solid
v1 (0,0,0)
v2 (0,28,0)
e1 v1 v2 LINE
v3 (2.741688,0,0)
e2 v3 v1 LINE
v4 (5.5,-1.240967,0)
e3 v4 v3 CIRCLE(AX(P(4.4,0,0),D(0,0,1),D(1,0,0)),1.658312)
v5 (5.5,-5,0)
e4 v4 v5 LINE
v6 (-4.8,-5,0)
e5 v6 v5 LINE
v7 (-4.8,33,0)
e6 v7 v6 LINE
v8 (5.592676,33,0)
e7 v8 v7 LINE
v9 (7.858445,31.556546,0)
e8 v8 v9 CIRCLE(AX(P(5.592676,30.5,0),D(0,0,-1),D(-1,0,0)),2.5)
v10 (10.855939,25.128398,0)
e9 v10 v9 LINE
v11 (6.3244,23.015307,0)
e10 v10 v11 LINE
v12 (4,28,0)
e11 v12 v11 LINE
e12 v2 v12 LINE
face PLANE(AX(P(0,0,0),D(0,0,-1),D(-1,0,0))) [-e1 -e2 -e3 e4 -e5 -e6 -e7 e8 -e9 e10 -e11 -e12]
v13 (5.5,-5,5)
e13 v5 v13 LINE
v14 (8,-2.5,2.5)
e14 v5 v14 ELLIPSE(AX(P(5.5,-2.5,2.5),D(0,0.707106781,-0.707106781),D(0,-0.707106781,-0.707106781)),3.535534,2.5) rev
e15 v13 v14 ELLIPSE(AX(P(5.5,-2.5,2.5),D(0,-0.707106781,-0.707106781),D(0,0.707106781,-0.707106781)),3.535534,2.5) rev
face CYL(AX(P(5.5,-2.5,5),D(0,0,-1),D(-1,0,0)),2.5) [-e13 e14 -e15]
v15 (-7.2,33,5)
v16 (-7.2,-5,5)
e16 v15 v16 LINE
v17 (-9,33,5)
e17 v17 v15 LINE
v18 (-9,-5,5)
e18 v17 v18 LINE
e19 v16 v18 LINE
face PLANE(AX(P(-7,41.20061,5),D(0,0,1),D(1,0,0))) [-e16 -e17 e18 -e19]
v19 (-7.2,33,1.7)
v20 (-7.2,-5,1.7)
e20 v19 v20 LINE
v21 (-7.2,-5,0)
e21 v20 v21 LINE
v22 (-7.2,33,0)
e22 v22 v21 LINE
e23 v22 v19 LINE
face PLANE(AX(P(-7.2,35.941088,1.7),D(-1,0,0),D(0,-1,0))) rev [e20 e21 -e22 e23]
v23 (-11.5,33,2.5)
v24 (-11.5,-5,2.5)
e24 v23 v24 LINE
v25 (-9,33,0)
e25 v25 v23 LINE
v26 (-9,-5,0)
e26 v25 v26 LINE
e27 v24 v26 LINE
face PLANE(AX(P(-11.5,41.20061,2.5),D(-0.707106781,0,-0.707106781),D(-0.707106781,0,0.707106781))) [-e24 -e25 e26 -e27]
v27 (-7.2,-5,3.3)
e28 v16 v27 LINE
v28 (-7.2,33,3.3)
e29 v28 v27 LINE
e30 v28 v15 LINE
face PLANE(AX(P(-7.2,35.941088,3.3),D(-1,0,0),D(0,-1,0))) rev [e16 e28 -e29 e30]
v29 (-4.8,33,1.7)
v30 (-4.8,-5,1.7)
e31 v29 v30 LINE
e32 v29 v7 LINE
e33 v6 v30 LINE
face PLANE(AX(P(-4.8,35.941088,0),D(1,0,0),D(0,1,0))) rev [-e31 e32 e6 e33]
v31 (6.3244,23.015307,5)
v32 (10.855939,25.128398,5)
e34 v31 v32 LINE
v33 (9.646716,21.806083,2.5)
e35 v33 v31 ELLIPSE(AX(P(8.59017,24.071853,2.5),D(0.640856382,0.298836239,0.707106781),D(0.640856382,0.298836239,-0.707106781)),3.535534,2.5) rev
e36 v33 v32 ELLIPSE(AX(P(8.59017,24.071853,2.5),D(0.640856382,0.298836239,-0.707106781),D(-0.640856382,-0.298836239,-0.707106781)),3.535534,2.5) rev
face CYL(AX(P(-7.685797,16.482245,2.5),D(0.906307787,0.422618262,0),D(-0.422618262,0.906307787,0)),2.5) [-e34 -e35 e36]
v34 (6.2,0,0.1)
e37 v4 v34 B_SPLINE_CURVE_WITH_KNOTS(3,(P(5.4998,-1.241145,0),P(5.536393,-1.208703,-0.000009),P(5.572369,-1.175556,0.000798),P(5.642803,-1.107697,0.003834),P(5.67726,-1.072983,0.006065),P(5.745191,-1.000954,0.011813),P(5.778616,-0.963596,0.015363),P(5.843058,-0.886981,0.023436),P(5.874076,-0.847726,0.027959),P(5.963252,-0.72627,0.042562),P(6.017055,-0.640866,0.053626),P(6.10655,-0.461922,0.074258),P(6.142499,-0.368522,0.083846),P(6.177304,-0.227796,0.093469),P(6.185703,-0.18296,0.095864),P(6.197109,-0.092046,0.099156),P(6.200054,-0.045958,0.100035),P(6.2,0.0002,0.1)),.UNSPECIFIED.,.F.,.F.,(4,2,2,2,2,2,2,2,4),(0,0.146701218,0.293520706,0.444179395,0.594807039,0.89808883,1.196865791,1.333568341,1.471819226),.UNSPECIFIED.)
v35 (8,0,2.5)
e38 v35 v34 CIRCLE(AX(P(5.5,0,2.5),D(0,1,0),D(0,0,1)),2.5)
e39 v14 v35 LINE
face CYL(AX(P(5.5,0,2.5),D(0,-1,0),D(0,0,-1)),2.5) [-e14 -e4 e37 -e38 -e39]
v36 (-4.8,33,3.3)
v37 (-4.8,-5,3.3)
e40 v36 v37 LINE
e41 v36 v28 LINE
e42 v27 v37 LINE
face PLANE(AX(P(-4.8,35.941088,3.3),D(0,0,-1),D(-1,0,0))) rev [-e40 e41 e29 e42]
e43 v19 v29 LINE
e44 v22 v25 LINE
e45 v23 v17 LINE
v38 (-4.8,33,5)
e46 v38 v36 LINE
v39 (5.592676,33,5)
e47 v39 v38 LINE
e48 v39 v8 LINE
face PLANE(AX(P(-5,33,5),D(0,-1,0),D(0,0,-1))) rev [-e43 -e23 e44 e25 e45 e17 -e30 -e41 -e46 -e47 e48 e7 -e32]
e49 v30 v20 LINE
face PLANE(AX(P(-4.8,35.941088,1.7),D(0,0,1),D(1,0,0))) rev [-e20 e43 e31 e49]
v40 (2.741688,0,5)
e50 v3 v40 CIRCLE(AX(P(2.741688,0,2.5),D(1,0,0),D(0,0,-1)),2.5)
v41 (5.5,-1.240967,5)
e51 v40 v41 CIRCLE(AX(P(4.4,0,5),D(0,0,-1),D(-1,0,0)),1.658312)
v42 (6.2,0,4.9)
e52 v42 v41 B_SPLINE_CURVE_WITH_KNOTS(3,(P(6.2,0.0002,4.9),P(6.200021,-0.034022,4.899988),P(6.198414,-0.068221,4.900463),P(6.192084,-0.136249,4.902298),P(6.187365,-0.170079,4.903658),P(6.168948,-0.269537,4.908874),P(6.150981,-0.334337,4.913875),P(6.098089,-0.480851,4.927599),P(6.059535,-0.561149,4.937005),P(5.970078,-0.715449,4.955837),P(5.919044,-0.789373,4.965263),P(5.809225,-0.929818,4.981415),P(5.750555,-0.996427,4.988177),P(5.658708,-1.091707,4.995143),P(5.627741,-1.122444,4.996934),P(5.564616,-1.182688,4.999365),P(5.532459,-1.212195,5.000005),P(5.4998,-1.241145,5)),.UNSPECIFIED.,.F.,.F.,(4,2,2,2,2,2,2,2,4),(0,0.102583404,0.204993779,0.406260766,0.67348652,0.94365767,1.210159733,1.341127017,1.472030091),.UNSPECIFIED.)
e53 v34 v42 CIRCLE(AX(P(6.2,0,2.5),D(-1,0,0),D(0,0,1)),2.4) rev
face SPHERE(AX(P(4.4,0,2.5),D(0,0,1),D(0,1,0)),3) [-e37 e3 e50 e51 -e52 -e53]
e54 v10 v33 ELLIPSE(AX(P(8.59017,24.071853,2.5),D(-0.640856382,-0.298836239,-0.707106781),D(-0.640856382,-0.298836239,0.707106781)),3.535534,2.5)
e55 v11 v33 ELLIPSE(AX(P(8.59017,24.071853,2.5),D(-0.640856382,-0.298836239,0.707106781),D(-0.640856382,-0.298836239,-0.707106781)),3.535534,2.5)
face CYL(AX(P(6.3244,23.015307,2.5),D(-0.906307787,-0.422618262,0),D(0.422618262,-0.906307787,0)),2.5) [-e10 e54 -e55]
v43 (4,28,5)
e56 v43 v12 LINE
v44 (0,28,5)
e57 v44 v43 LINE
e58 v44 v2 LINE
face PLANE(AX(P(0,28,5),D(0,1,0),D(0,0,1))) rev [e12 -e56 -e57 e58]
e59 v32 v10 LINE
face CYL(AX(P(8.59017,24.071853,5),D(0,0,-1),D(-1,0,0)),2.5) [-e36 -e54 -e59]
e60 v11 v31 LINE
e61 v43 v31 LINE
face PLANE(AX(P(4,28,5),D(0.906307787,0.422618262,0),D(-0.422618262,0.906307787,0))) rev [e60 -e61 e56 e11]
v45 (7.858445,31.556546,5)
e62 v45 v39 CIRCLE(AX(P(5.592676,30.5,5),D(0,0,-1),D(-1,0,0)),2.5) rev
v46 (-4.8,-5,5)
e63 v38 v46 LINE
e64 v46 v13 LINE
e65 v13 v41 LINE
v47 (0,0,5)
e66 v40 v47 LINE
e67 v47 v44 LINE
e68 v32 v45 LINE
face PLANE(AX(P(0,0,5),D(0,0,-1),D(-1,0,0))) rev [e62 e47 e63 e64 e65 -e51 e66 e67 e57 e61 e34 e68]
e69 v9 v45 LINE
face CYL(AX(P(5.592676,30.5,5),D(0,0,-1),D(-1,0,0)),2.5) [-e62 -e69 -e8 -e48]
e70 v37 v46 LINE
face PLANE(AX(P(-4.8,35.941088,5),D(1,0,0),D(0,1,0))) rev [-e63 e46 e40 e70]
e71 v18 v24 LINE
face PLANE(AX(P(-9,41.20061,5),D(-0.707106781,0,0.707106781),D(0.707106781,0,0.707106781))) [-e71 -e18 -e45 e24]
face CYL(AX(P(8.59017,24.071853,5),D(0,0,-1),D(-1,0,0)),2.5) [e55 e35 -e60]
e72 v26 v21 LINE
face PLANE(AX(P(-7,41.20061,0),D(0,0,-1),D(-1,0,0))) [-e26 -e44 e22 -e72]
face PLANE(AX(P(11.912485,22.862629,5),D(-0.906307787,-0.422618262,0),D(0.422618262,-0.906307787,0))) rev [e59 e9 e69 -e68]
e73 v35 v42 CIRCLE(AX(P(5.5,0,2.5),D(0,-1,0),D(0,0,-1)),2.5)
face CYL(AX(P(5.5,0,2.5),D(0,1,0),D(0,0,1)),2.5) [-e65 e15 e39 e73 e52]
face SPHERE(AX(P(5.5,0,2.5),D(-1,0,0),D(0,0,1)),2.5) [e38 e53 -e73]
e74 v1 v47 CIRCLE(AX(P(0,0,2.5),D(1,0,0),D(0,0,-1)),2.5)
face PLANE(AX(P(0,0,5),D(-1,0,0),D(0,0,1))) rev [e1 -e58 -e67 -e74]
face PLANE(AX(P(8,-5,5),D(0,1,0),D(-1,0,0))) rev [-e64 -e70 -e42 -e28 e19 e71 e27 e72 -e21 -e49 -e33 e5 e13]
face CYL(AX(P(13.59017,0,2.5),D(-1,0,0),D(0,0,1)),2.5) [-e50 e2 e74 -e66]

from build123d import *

# Parameters (mm, degrees)
EXTRUDE_1_DEPTH     = 5
FILLET_1_R          = 2.5
EXTRUDE_2_DEPTH     = 8
FILLET_3_R          = 2.5
SKETCH_5_W          = 1.467751534
SKETCH_5_H          = 4.178210798
SKETCH_5_W_2        = 1.389566385
CUT_EXTRUDE_1_DEPTH = 20
EXTRUDE_3_DEPTH     = 38
SKETCH_7_W          = 2.4
SKETCH_7_H          = 1.7
CUT_EXTRUDE_2_DEPTH = 38


with BuildPart() as part:
    # 草图1 → 凸台-拉伸1 (new body)
    with BuildSketch(Plane.XY):
        Polygon((0, 0), (0, 28), (4, 28), (7.380946094, 20.749537704), (11.912485029, 22.862629012), (7.185351304, 33), (-5, 33), (-5, -5), (8, -5), (8, 0), align=None)
    extrude(amount=EXTRUDE_1_DEPTH)

    # 圆角1
    fillet_1_edges = [part.edges().sort_by_distance(p)[0] for p in [
        (9.646715562, 21.806083358, 0),
        (7.185351304, 33, 2.5),
        (11.912485029, 22.862629012, 2.5),
        (7.380946094, 20.749537704, 2.5),
        (9.646715562, 21.806083358, 5),
    ]]
    fillet(fillet_1_edges, radius=FILLET_1_R - 0.0001)  # a hair under: the kernel refuses the full size

    # 草图3 → 凸台-拉伸2 (add)
    with BuildSketch(Plane(origin=(0, 0, 0), x_dir=(0, 0, -1), z_dir=(1, 0, 0))):
        with BuildLine():
            Line((-5, 0), (0, 0))
            ThreePointArc((0, 0), (-2.5, 2.5), (-5, 0))
        make_face()
    extrude(amount=EXTRUDE_2_DEPTH)

    # 圆角3
    fillet_3_edges = [part.edges().sort_by_distance(p)[0] for p in [
        (8, -2.5, 0),
        (8, -5, 2.5),
        (8, -2.5, 5),
        (8, 2.5, 2.5),
    ]]
    fillet(fillet_3_edges, radius=FILLET_3_R - 0.0001)  # a hair under: the kernel refuses the full size

    # 草图4 → 旋转3 (revolve)
    with BuildSketch(Plane(origin=(4.4, 0, 0), x_dir=(0, 0, -1), z_dir=(1, 0, 0))):
        with BuildLine():
            Line((-5.5, 0), (0.5, 0))
            ThreePointArc((0.5, 0), (-2.5, 3), (-5.5, 0))
        make_face()
    revolve(axis=Axis((4.4, 0, 2.5), (0, 0, -1)))

    # 草图5 → 切除-拉伸1 (cut)
    with BuildSketch(Plane.ZY.offset(5)):
        with Locations((-0.733875767, -0.010051234)):
            Rectangle(SKETCH_5_W, SKETCH_5_H)
        with Locations((5.694783193, -0.010051234)):
            Rectangle(SKETCH_5_W_2, SKETCH_5_H)
    extrude(amount=-CUT_EXTRUDE_1_DEPTH, mode=Mode.SUBTRACT)

    # 草图6 → 凸台-拉伸3 (add)
    with BuildSketch(Plane.XZ.offset(5)):
        Polygon((-5, 2.5), (-5, 3.5), (-7, 3.5), (-7, 5), (-9, 5), (-11.5, 2.5), (-9, 0), (-7, 0), (-7, 1.5), (-5, 1.5), align=None)
    extrude(amount=-EXTRUDE_3_DEPTH)

    # 草图7 → 切除-拉伸2 (cut)
    with BuildSketch(Plane.XZ.offset(5)):
        with Locations((-6, 4.15)):
            Rectangle(SKETCH_7_W, SKETCH_7_H)
        with Locations((-6, 0.85)):
            Rectangle(SKETCH_7_W, SKETCH_7_H)
    extrude(amount=-CUT_EXTRUDE_2_DEPTH, mode=Mode.SUBTRACT)


solid = part.part
